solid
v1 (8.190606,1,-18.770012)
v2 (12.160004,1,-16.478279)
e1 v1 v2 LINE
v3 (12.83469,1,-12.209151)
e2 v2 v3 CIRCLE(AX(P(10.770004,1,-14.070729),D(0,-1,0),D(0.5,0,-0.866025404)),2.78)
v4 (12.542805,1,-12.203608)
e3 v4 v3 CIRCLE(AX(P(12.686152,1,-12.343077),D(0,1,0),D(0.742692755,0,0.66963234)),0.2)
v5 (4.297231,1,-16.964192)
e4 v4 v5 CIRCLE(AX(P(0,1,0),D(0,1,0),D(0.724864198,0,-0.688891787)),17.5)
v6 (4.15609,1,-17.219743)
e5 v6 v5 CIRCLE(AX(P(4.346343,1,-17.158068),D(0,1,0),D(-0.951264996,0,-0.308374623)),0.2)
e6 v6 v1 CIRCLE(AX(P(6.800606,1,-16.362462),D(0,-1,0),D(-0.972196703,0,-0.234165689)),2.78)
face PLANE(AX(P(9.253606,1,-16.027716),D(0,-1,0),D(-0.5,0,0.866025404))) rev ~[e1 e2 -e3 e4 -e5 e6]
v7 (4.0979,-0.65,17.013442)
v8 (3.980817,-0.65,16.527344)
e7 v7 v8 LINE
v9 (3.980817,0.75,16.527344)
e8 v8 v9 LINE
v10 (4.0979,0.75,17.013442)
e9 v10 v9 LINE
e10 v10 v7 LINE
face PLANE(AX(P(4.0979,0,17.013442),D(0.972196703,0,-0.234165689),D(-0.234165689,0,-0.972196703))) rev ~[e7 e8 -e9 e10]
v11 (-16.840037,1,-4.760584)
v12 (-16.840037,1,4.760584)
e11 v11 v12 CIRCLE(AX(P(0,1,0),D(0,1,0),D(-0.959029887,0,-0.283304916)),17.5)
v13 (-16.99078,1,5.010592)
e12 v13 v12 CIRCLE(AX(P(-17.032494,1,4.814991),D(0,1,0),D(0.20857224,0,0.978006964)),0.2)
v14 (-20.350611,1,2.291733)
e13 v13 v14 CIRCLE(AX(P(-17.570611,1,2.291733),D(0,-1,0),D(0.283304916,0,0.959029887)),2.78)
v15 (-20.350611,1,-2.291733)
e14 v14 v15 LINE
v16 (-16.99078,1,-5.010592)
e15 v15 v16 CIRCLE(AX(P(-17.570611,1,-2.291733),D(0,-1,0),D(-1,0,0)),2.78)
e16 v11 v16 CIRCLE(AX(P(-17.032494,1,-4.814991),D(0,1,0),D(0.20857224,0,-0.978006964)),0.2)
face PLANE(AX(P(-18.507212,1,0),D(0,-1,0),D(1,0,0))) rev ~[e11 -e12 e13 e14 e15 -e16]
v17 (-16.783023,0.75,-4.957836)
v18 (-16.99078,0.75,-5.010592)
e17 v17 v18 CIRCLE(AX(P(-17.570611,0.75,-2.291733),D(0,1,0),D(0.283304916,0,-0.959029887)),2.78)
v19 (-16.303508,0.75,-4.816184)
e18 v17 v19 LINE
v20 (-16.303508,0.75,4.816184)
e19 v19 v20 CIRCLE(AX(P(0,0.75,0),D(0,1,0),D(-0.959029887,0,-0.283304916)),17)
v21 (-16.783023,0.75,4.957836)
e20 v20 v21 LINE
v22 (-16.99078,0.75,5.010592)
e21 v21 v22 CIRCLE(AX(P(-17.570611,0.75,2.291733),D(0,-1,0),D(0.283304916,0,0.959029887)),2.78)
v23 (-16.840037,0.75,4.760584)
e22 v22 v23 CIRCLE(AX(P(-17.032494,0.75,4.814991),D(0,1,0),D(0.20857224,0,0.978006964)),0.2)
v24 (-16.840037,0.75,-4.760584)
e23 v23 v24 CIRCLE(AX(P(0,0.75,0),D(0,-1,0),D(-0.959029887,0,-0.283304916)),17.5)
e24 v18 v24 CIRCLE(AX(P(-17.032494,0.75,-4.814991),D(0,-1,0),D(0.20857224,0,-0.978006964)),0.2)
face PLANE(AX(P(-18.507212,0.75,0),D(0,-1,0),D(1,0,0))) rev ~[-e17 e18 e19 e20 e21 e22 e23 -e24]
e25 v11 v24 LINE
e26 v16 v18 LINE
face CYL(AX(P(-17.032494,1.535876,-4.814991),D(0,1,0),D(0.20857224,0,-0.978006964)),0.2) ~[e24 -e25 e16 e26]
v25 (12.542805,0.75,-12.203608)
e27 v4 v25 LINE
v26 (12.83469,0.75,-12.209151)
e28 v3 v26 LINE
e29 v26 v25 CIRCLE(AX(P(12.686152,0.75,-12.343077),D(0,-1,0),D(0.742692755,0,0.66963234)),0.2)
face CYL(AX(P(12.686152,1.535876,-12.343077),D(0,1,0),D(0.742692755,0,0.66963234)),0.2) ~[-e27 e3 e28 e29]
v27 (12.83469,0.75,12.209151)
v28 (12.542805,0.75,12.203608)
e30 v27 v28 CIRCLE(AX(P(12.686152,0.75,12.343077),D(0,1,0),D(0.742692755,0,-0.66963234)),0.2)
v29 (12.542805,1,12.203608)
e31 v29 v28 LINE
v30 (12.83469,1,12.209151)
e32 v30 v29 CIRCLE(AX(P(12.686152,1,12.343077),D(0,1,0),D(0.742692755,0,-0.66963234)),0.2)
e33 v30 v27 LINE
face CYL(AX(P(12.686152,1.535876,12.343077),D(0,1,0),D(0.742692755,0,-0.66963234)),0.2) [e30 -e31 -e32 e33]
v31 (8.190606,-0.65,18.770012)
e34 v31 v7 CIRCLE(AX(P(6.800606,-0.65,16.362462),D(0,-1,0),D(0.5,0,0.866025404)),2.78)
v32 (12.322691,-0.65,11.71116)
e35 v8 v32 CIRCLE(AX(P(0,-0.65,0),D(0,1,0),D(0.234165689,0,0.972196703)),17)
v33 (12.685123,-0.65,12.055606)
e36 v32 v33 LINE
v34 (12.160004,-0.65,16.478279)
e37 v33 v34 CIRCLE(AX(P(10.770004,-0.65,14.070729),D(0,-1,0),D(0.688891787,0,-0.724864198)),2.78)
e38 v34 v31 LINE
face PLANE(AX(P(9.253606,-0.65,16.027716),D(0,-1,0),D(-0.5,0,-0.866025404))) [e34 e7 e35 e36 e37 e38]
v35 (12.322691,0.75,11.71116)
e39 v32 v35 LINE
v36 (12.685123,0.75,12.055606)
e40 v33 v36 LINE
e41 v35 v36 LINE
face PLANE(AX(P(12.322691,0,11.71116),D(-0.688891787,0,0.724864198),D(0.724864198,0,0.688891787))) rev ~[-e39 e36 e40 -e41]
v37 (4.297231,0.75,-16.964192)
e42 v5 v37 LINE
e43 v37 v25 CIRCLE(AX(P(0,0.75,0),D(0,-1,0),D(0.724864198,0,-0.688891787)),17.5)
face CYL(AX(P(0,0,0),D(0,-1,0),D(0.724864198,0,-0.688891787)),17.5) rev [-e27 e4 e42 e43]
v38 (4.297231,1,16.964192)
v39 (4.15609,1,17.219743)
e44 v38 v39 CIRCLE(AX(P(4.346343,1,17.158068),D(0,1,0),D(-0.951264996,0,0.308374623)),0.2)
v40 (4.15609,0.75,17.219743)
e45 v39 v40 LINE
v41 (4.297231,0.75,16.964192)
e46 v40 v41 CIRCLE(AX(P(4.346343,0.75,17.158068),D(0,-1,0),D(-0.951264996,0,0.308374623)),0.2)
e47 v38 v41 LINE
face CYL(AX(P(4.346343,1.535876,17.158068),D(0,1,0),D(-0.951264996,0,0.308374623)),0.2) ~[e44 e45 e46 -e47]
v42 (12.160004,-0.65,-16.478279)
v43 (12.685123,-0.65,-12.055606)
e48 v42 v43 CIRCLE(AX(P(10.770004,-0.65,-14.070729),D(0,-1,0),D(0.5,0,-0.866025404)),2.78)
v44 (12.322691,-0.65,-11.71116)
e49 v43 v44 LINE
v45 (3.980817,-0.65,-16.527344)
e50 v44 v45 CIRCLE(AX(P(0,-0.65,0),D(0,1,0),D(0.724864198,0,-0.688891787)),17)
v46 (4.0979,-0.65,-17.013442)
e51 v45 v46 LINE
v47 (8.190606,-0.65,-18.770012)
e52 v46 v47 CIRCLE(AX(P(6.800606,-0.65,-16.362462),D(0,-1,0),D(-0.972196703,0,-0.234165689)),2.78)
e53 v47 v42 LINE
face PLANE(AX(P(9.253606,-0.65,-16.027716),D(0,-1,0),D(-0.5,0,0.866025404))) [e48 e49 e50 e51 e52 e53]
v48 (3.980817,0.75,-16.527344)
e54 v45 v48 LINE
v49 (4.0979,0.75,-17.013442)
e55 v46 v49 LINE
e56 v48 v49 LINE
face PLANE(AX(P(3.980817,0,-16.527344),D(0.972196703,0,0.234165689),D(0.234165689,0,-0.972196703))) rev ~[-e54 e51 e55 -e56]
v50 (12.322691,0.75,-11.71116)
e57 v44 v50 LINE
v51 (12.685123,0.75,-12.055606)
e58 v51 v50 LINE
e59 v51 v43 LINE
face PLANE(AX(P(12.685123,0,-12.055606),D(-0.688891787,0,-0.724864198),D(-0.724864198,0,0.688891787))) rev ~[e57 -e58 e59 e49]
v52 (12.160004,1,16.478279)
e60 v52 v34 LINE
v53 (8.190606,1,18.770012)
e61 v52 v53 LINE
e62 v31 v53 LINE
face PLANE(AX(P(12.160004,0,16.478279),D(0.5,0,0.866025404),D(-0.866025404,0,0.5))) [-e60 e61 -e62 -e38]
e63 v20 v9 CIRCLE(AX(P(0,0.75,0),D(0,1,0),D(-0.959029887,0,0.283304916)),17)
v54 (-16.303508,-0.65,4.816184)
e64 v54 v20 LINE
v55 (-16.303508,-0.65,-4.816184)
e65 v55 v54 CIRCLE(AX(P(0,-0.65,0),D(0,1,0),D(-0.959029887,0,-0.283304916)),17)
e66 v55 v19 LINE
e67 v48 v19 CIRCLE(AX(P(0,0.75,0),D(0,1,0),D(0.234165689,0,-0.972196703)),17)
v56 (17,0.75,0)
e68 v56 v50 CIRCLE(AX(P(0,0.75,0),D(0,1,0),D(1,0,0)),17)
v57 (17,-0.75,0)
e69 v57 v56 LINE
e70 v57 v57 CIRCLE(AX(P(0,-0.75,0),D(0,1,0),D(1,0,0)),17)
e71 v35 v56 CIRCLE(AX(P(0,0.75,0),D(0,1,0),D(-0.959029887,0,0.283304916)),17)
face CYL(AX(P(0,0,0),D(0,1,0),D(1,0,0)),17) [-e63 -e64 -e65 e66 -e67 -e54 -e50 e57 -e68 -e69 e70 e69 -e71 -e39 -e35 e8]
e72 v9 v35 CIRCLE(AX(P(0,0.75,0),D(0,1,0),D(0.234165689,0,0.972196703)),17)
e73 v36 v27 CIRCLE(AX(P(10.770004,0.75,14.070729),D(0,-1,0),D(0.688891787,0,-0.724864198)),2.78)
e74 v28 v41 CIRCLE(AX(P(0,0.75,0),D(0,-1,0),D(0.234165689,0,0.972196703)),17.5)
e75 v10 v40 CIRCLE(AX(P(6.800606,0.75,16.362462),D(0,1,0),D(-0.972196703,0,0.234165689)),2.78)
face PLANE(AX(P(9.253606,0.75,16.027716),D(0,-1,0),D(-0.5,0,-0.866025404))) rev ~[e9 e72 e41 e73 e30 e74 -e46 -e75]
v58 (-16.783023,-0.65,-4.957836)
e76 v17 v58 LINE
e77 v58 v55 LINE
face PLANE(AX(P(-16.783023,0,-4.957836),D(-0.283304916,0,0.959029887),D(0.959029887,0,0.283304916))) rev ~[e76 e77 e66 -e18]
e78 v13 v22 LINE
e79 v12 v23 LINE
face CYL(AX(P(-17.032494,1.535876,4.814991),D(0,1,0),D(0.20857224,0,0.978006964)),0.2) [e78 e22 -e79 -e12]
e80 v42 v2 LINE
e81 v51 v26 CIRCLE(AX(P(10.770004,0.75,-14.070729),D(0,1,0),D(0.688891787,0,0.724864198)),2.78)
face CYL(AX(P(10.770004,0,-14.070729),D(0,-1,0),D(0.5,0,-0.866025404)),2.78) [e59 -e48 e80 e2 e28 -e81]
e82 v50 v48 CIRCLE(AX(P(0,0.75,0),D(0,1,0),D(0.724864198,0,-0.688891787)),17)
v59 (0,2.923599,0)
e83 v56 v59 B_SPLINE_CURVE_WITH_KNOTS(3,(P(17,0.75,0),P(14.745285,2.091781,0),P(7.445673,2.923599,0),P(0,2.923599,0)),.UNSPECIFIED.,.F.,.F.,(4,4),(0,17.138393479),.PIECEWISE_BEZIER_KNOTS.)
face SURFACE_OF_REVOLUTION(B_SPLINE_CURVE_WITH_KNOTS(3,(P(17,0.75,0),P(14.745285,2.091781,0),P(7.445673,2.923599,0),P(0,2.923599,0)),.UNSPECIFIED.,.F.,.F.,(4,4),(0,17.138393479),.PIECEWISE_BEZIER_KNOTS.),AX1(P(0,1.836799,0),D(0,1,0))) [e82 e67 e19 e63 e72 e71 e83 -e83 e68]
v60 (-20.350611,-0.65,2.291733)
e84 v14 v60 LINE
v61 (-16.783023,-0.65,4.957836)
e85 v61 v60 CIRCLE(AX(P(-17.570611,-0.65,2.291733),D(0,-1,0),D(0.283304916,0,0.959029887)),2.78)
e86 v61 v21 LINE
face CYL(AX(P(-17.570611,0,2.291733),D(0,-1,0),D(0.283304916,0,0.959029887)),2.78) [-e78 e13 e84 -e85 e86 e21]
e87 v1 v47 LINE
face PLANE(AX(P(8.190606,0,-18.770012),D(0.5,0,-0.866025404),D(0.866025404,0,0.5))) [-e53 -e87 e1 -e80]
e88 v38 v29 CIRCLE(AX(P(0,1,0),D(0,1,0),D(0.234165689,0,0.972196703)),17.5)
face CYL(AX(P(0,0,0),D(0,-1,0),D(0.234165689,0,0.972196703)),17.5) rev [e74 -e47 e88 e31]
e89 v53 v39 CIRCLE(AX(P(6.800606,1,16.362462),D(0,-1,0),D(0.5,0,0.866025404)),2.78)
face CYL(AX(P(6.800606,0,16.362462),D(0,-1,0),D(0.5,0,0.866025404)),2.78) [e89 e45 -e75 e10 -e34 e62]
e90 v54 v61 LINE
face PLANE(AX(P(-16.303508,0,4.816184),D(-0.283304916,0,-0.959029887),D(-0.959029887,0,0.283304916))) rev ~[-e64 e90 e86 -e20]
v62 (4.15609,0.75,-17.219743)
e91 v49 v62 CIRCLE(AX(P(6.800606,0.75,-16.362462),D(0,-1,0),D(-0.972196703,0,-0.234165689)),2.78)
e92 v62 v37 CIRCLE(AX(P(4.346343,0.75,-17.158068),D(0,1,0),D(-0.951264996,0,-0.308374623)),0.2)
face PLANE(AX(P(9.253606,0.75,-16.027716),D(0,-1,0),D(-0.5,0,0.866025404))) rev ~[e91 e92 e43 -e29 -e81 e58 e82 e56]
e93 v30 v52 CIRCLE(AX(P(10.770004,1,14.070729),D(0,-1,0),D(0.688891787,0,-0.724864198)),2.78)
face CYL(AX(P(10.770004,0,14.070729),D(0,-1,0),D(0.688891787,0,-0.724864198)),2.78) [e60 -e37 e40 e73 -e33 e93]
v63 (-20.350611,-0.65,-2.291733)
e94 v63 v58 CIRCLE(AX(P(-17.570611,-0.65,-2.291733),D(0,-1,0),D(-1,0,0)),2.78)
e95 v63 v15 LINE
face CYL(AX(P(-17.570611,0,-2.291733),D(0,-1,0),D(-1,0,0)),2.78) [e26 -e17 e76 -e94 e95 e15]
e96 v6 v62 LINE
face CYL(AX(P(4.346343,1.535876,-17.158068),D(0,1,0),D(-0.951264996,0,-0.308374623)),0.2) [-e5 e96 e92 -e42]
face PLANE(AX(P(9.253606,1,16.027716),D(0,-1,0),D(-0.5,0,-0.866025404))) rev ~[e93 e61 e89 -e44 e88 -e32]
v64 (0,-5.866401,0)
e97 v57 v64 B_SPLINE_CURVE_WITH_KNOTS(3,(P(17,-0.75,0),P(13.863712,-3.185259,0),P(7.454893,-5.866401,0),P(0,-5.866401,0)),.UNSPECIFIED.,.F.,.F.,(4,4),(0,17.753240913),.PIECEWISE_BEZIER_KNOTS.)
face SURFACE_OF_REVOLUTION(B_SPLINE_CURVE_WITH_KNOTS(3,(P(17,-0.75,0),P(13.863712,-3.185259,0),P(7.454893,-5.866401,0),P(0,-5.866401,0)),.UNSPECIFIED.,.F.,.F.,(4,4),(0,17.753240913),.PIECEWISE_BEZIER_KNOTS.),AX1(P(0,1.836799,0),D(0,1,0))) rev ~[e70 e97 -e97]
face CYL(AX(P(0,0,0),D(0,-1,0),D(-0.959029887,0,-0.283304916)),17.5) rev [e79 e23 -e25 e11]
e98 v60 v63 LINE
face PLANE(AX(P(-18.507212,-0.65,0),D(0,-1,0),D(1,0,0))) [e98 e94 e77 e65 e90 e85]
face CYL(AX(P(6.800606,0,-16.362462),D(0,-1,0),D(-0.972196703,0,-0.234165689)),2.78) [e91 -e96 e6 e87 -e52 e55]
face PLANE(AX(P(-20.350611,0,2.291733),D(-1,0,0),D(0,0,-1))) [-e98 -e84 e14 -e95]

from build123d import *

# Parameters (mm, degrees)
F0_W          = 17
F0_H          = 1.5
F3_DEPTH      = 0.75
F3_DEPTH_BACK = 0.65
F4_DEPTH      = 1
F5_T1_DEPTH   = 0.7858762015
F6_COUNT      = 3
F6_ANGLE      = 240


# Not quite as in the source:
# - a fillet or chamfer that OpenCascade refuses, or shapes differently, is made with other operations: its cross-section is extruded or revolved along the edge and cut away or added
# - a feature names something its author has since deleted; it is built from what else it names


with BuildPart() as f1:
    # F0 (on Top) → F1 (revolve)
    with BuildSketch(Plane.XY):
        with BuildLine():
            Line((0, 2.9235986368), (0, 0.75))
            Line((0, 0.75), (17, 0.75))
            add(Edge.make_bspline(
                [(17, 0.75), (14.7452850491, 2.0917814691), (7.445672527, 2.9235986368), (0, 2.9235986368)],
                knots=[0, 0, 0, 0, 17.1383934788, 17.1383934788, 17.1383934788, 17.1383934788], degree=3))
        make_face()
        with Locations((8.5, 0)):
            Rectangle(F0_W, F0_H)
        with BuildLine():
            Line((17, -0.75), (0, -0.75))
            Line((0, -0.75), (0, -5.8664013632))
            add(Edge.make_bspline(
                [(17, -0.75), (13.8637118638, -3.1852589455), (7.4548930861, -5.8664013632), (0, -5.8664013632)],
                knots=[0, 0, 0, 0, 17.7532409128, 17.7532409128, 17.7532409128, 17.7532409128], degree=3))
        make_face()
    revolve(axis=Axis((0, 1.8367993184, 0), (0, 1, 0)))

    # F2 (on Front) → F3 (join, two sides)
    with BuildSketch(Plane.XZ) as f3_sk:
        with BuildLine():
            ThreePointArc((-16.7830230255, -4.9578360326), (-17.5, 0), (-16.7830230255, 4.9578360326))
            ThreePointArc((-16.7830230255, 4.9578360326), (-19.2347780947, 4.5186022412), (-20.3506106924, 2.2917329463))
            Line((-20.3506106924, 2.2917329463), (-20.3506106924, 0))
            Line((-20.3506106924, 0), (-20.3506106924, -2.2917329463))
            ThreePointArc((-20.3506106924, -2.2917329463), (-19.2347780947, -4.5186022412), (-16.7830230255, -4.9578360326))
        make_face()
        with BuildLine():
            ThreePointArc((-16.3035080819, -4.8161835745), (-17, 0), (-16.3035080819, 4.8161835745))
            Line((-16.3035080819, 4.8161835745), (-16.7830230255, 4.9578360326))
            ThreePointArc((-16.7830230255, 4.9578360326), (-17.5, 0), (-16.7830230255, -4.9578360326))
            Line((-16.7830230255, -4.9578360326), (-16.3035080819, -4.8161835745))
        make_face()
    extrude(amount=-F3_DEPTH)
    extrude(f3_sk.sketch, amount=F3_DEPTH_BACK)

    # F2 (on Front) → F4 (join)
    with BuildSketch(Plane.XZ):
        with BuildLine():
            ThreePointArc((-16.7830230255, -4.9578360326), (-17.5, 0), (-16.7830230255, 4.9578360326))
            ThreePointArc((-16.7830230255, 4.9578360326), (-19.2347780947, 4.5186022412), (-20.3506106924, 2.2917329463))
            Line((-20.3506106924, 2.2917329463), (-20.3506106924, 0))
            Line((-20.3506106924, 0), (-20.3506106924, -2.2917329463))
            ThreePointArc((-20.3506106924, -2.2917329463), (-19.2347780947, -4.5186022412), (-16.7830230255, -4.9578360326))
        make_face()
    extrude(amount=-F4_DEPTH)

    # F5: fillet of radius 0.2 on 2 edges, made by hand

    # F5_s2 → F5_t1 (cut)
    with BuildSketch(Plane.XZ.offset(-1.5358762015)):
        with BuildLine():
            ThreePointArc((-16.9907798648, -5.0105923048), (-16.8612192668, -4.9182617144), (-16.84003675, -4.7605842351))
            ThreePointArc((-16.84003675, -4.7605842351), (-16.8118191828, -4.8592937518), (-16.7830230255, -4.9578360326))
            ThreePointArc((-16.7830230255, -4.9578360326), (-16.8863927879, -4.9862172864), (-16.9907798648, -5.0105923048))
        make_face()
        with BuildLine():
            ThreePointArc((-16.9907798648, 5.0105923048), (-16.8612192668, 4.9182617144), (-16.84003675, 4.7605842351))
            ThreePointArc((-16.84003675, 4.7605842351), (-16.8118191828, 4.8592937518), (-16.7830230255, 4.9578360326))
            ThreePointArc((-16.7830230255, 4.9578360326), (-16.8863927879, 4.9862172864), (-16.9907798648, 5.0105923048))
        make_face()
    extrude(amount=F5_T1_DEPTH, mode=Mode.SUBTRACT)

    # F6: F1 ×3 about axis
    f6_axis = Axis((0, -3.3082006816, 0), (0, -1, 0))


with BuildPart() as f1_1:
    add(f1.part)
    for i in range(1, F6_COUNT):
        add(f1.part.rotate(f6_axis, i * F6_ANGLE / (F6_COUNT - 1)))


solid = f1_1.part
